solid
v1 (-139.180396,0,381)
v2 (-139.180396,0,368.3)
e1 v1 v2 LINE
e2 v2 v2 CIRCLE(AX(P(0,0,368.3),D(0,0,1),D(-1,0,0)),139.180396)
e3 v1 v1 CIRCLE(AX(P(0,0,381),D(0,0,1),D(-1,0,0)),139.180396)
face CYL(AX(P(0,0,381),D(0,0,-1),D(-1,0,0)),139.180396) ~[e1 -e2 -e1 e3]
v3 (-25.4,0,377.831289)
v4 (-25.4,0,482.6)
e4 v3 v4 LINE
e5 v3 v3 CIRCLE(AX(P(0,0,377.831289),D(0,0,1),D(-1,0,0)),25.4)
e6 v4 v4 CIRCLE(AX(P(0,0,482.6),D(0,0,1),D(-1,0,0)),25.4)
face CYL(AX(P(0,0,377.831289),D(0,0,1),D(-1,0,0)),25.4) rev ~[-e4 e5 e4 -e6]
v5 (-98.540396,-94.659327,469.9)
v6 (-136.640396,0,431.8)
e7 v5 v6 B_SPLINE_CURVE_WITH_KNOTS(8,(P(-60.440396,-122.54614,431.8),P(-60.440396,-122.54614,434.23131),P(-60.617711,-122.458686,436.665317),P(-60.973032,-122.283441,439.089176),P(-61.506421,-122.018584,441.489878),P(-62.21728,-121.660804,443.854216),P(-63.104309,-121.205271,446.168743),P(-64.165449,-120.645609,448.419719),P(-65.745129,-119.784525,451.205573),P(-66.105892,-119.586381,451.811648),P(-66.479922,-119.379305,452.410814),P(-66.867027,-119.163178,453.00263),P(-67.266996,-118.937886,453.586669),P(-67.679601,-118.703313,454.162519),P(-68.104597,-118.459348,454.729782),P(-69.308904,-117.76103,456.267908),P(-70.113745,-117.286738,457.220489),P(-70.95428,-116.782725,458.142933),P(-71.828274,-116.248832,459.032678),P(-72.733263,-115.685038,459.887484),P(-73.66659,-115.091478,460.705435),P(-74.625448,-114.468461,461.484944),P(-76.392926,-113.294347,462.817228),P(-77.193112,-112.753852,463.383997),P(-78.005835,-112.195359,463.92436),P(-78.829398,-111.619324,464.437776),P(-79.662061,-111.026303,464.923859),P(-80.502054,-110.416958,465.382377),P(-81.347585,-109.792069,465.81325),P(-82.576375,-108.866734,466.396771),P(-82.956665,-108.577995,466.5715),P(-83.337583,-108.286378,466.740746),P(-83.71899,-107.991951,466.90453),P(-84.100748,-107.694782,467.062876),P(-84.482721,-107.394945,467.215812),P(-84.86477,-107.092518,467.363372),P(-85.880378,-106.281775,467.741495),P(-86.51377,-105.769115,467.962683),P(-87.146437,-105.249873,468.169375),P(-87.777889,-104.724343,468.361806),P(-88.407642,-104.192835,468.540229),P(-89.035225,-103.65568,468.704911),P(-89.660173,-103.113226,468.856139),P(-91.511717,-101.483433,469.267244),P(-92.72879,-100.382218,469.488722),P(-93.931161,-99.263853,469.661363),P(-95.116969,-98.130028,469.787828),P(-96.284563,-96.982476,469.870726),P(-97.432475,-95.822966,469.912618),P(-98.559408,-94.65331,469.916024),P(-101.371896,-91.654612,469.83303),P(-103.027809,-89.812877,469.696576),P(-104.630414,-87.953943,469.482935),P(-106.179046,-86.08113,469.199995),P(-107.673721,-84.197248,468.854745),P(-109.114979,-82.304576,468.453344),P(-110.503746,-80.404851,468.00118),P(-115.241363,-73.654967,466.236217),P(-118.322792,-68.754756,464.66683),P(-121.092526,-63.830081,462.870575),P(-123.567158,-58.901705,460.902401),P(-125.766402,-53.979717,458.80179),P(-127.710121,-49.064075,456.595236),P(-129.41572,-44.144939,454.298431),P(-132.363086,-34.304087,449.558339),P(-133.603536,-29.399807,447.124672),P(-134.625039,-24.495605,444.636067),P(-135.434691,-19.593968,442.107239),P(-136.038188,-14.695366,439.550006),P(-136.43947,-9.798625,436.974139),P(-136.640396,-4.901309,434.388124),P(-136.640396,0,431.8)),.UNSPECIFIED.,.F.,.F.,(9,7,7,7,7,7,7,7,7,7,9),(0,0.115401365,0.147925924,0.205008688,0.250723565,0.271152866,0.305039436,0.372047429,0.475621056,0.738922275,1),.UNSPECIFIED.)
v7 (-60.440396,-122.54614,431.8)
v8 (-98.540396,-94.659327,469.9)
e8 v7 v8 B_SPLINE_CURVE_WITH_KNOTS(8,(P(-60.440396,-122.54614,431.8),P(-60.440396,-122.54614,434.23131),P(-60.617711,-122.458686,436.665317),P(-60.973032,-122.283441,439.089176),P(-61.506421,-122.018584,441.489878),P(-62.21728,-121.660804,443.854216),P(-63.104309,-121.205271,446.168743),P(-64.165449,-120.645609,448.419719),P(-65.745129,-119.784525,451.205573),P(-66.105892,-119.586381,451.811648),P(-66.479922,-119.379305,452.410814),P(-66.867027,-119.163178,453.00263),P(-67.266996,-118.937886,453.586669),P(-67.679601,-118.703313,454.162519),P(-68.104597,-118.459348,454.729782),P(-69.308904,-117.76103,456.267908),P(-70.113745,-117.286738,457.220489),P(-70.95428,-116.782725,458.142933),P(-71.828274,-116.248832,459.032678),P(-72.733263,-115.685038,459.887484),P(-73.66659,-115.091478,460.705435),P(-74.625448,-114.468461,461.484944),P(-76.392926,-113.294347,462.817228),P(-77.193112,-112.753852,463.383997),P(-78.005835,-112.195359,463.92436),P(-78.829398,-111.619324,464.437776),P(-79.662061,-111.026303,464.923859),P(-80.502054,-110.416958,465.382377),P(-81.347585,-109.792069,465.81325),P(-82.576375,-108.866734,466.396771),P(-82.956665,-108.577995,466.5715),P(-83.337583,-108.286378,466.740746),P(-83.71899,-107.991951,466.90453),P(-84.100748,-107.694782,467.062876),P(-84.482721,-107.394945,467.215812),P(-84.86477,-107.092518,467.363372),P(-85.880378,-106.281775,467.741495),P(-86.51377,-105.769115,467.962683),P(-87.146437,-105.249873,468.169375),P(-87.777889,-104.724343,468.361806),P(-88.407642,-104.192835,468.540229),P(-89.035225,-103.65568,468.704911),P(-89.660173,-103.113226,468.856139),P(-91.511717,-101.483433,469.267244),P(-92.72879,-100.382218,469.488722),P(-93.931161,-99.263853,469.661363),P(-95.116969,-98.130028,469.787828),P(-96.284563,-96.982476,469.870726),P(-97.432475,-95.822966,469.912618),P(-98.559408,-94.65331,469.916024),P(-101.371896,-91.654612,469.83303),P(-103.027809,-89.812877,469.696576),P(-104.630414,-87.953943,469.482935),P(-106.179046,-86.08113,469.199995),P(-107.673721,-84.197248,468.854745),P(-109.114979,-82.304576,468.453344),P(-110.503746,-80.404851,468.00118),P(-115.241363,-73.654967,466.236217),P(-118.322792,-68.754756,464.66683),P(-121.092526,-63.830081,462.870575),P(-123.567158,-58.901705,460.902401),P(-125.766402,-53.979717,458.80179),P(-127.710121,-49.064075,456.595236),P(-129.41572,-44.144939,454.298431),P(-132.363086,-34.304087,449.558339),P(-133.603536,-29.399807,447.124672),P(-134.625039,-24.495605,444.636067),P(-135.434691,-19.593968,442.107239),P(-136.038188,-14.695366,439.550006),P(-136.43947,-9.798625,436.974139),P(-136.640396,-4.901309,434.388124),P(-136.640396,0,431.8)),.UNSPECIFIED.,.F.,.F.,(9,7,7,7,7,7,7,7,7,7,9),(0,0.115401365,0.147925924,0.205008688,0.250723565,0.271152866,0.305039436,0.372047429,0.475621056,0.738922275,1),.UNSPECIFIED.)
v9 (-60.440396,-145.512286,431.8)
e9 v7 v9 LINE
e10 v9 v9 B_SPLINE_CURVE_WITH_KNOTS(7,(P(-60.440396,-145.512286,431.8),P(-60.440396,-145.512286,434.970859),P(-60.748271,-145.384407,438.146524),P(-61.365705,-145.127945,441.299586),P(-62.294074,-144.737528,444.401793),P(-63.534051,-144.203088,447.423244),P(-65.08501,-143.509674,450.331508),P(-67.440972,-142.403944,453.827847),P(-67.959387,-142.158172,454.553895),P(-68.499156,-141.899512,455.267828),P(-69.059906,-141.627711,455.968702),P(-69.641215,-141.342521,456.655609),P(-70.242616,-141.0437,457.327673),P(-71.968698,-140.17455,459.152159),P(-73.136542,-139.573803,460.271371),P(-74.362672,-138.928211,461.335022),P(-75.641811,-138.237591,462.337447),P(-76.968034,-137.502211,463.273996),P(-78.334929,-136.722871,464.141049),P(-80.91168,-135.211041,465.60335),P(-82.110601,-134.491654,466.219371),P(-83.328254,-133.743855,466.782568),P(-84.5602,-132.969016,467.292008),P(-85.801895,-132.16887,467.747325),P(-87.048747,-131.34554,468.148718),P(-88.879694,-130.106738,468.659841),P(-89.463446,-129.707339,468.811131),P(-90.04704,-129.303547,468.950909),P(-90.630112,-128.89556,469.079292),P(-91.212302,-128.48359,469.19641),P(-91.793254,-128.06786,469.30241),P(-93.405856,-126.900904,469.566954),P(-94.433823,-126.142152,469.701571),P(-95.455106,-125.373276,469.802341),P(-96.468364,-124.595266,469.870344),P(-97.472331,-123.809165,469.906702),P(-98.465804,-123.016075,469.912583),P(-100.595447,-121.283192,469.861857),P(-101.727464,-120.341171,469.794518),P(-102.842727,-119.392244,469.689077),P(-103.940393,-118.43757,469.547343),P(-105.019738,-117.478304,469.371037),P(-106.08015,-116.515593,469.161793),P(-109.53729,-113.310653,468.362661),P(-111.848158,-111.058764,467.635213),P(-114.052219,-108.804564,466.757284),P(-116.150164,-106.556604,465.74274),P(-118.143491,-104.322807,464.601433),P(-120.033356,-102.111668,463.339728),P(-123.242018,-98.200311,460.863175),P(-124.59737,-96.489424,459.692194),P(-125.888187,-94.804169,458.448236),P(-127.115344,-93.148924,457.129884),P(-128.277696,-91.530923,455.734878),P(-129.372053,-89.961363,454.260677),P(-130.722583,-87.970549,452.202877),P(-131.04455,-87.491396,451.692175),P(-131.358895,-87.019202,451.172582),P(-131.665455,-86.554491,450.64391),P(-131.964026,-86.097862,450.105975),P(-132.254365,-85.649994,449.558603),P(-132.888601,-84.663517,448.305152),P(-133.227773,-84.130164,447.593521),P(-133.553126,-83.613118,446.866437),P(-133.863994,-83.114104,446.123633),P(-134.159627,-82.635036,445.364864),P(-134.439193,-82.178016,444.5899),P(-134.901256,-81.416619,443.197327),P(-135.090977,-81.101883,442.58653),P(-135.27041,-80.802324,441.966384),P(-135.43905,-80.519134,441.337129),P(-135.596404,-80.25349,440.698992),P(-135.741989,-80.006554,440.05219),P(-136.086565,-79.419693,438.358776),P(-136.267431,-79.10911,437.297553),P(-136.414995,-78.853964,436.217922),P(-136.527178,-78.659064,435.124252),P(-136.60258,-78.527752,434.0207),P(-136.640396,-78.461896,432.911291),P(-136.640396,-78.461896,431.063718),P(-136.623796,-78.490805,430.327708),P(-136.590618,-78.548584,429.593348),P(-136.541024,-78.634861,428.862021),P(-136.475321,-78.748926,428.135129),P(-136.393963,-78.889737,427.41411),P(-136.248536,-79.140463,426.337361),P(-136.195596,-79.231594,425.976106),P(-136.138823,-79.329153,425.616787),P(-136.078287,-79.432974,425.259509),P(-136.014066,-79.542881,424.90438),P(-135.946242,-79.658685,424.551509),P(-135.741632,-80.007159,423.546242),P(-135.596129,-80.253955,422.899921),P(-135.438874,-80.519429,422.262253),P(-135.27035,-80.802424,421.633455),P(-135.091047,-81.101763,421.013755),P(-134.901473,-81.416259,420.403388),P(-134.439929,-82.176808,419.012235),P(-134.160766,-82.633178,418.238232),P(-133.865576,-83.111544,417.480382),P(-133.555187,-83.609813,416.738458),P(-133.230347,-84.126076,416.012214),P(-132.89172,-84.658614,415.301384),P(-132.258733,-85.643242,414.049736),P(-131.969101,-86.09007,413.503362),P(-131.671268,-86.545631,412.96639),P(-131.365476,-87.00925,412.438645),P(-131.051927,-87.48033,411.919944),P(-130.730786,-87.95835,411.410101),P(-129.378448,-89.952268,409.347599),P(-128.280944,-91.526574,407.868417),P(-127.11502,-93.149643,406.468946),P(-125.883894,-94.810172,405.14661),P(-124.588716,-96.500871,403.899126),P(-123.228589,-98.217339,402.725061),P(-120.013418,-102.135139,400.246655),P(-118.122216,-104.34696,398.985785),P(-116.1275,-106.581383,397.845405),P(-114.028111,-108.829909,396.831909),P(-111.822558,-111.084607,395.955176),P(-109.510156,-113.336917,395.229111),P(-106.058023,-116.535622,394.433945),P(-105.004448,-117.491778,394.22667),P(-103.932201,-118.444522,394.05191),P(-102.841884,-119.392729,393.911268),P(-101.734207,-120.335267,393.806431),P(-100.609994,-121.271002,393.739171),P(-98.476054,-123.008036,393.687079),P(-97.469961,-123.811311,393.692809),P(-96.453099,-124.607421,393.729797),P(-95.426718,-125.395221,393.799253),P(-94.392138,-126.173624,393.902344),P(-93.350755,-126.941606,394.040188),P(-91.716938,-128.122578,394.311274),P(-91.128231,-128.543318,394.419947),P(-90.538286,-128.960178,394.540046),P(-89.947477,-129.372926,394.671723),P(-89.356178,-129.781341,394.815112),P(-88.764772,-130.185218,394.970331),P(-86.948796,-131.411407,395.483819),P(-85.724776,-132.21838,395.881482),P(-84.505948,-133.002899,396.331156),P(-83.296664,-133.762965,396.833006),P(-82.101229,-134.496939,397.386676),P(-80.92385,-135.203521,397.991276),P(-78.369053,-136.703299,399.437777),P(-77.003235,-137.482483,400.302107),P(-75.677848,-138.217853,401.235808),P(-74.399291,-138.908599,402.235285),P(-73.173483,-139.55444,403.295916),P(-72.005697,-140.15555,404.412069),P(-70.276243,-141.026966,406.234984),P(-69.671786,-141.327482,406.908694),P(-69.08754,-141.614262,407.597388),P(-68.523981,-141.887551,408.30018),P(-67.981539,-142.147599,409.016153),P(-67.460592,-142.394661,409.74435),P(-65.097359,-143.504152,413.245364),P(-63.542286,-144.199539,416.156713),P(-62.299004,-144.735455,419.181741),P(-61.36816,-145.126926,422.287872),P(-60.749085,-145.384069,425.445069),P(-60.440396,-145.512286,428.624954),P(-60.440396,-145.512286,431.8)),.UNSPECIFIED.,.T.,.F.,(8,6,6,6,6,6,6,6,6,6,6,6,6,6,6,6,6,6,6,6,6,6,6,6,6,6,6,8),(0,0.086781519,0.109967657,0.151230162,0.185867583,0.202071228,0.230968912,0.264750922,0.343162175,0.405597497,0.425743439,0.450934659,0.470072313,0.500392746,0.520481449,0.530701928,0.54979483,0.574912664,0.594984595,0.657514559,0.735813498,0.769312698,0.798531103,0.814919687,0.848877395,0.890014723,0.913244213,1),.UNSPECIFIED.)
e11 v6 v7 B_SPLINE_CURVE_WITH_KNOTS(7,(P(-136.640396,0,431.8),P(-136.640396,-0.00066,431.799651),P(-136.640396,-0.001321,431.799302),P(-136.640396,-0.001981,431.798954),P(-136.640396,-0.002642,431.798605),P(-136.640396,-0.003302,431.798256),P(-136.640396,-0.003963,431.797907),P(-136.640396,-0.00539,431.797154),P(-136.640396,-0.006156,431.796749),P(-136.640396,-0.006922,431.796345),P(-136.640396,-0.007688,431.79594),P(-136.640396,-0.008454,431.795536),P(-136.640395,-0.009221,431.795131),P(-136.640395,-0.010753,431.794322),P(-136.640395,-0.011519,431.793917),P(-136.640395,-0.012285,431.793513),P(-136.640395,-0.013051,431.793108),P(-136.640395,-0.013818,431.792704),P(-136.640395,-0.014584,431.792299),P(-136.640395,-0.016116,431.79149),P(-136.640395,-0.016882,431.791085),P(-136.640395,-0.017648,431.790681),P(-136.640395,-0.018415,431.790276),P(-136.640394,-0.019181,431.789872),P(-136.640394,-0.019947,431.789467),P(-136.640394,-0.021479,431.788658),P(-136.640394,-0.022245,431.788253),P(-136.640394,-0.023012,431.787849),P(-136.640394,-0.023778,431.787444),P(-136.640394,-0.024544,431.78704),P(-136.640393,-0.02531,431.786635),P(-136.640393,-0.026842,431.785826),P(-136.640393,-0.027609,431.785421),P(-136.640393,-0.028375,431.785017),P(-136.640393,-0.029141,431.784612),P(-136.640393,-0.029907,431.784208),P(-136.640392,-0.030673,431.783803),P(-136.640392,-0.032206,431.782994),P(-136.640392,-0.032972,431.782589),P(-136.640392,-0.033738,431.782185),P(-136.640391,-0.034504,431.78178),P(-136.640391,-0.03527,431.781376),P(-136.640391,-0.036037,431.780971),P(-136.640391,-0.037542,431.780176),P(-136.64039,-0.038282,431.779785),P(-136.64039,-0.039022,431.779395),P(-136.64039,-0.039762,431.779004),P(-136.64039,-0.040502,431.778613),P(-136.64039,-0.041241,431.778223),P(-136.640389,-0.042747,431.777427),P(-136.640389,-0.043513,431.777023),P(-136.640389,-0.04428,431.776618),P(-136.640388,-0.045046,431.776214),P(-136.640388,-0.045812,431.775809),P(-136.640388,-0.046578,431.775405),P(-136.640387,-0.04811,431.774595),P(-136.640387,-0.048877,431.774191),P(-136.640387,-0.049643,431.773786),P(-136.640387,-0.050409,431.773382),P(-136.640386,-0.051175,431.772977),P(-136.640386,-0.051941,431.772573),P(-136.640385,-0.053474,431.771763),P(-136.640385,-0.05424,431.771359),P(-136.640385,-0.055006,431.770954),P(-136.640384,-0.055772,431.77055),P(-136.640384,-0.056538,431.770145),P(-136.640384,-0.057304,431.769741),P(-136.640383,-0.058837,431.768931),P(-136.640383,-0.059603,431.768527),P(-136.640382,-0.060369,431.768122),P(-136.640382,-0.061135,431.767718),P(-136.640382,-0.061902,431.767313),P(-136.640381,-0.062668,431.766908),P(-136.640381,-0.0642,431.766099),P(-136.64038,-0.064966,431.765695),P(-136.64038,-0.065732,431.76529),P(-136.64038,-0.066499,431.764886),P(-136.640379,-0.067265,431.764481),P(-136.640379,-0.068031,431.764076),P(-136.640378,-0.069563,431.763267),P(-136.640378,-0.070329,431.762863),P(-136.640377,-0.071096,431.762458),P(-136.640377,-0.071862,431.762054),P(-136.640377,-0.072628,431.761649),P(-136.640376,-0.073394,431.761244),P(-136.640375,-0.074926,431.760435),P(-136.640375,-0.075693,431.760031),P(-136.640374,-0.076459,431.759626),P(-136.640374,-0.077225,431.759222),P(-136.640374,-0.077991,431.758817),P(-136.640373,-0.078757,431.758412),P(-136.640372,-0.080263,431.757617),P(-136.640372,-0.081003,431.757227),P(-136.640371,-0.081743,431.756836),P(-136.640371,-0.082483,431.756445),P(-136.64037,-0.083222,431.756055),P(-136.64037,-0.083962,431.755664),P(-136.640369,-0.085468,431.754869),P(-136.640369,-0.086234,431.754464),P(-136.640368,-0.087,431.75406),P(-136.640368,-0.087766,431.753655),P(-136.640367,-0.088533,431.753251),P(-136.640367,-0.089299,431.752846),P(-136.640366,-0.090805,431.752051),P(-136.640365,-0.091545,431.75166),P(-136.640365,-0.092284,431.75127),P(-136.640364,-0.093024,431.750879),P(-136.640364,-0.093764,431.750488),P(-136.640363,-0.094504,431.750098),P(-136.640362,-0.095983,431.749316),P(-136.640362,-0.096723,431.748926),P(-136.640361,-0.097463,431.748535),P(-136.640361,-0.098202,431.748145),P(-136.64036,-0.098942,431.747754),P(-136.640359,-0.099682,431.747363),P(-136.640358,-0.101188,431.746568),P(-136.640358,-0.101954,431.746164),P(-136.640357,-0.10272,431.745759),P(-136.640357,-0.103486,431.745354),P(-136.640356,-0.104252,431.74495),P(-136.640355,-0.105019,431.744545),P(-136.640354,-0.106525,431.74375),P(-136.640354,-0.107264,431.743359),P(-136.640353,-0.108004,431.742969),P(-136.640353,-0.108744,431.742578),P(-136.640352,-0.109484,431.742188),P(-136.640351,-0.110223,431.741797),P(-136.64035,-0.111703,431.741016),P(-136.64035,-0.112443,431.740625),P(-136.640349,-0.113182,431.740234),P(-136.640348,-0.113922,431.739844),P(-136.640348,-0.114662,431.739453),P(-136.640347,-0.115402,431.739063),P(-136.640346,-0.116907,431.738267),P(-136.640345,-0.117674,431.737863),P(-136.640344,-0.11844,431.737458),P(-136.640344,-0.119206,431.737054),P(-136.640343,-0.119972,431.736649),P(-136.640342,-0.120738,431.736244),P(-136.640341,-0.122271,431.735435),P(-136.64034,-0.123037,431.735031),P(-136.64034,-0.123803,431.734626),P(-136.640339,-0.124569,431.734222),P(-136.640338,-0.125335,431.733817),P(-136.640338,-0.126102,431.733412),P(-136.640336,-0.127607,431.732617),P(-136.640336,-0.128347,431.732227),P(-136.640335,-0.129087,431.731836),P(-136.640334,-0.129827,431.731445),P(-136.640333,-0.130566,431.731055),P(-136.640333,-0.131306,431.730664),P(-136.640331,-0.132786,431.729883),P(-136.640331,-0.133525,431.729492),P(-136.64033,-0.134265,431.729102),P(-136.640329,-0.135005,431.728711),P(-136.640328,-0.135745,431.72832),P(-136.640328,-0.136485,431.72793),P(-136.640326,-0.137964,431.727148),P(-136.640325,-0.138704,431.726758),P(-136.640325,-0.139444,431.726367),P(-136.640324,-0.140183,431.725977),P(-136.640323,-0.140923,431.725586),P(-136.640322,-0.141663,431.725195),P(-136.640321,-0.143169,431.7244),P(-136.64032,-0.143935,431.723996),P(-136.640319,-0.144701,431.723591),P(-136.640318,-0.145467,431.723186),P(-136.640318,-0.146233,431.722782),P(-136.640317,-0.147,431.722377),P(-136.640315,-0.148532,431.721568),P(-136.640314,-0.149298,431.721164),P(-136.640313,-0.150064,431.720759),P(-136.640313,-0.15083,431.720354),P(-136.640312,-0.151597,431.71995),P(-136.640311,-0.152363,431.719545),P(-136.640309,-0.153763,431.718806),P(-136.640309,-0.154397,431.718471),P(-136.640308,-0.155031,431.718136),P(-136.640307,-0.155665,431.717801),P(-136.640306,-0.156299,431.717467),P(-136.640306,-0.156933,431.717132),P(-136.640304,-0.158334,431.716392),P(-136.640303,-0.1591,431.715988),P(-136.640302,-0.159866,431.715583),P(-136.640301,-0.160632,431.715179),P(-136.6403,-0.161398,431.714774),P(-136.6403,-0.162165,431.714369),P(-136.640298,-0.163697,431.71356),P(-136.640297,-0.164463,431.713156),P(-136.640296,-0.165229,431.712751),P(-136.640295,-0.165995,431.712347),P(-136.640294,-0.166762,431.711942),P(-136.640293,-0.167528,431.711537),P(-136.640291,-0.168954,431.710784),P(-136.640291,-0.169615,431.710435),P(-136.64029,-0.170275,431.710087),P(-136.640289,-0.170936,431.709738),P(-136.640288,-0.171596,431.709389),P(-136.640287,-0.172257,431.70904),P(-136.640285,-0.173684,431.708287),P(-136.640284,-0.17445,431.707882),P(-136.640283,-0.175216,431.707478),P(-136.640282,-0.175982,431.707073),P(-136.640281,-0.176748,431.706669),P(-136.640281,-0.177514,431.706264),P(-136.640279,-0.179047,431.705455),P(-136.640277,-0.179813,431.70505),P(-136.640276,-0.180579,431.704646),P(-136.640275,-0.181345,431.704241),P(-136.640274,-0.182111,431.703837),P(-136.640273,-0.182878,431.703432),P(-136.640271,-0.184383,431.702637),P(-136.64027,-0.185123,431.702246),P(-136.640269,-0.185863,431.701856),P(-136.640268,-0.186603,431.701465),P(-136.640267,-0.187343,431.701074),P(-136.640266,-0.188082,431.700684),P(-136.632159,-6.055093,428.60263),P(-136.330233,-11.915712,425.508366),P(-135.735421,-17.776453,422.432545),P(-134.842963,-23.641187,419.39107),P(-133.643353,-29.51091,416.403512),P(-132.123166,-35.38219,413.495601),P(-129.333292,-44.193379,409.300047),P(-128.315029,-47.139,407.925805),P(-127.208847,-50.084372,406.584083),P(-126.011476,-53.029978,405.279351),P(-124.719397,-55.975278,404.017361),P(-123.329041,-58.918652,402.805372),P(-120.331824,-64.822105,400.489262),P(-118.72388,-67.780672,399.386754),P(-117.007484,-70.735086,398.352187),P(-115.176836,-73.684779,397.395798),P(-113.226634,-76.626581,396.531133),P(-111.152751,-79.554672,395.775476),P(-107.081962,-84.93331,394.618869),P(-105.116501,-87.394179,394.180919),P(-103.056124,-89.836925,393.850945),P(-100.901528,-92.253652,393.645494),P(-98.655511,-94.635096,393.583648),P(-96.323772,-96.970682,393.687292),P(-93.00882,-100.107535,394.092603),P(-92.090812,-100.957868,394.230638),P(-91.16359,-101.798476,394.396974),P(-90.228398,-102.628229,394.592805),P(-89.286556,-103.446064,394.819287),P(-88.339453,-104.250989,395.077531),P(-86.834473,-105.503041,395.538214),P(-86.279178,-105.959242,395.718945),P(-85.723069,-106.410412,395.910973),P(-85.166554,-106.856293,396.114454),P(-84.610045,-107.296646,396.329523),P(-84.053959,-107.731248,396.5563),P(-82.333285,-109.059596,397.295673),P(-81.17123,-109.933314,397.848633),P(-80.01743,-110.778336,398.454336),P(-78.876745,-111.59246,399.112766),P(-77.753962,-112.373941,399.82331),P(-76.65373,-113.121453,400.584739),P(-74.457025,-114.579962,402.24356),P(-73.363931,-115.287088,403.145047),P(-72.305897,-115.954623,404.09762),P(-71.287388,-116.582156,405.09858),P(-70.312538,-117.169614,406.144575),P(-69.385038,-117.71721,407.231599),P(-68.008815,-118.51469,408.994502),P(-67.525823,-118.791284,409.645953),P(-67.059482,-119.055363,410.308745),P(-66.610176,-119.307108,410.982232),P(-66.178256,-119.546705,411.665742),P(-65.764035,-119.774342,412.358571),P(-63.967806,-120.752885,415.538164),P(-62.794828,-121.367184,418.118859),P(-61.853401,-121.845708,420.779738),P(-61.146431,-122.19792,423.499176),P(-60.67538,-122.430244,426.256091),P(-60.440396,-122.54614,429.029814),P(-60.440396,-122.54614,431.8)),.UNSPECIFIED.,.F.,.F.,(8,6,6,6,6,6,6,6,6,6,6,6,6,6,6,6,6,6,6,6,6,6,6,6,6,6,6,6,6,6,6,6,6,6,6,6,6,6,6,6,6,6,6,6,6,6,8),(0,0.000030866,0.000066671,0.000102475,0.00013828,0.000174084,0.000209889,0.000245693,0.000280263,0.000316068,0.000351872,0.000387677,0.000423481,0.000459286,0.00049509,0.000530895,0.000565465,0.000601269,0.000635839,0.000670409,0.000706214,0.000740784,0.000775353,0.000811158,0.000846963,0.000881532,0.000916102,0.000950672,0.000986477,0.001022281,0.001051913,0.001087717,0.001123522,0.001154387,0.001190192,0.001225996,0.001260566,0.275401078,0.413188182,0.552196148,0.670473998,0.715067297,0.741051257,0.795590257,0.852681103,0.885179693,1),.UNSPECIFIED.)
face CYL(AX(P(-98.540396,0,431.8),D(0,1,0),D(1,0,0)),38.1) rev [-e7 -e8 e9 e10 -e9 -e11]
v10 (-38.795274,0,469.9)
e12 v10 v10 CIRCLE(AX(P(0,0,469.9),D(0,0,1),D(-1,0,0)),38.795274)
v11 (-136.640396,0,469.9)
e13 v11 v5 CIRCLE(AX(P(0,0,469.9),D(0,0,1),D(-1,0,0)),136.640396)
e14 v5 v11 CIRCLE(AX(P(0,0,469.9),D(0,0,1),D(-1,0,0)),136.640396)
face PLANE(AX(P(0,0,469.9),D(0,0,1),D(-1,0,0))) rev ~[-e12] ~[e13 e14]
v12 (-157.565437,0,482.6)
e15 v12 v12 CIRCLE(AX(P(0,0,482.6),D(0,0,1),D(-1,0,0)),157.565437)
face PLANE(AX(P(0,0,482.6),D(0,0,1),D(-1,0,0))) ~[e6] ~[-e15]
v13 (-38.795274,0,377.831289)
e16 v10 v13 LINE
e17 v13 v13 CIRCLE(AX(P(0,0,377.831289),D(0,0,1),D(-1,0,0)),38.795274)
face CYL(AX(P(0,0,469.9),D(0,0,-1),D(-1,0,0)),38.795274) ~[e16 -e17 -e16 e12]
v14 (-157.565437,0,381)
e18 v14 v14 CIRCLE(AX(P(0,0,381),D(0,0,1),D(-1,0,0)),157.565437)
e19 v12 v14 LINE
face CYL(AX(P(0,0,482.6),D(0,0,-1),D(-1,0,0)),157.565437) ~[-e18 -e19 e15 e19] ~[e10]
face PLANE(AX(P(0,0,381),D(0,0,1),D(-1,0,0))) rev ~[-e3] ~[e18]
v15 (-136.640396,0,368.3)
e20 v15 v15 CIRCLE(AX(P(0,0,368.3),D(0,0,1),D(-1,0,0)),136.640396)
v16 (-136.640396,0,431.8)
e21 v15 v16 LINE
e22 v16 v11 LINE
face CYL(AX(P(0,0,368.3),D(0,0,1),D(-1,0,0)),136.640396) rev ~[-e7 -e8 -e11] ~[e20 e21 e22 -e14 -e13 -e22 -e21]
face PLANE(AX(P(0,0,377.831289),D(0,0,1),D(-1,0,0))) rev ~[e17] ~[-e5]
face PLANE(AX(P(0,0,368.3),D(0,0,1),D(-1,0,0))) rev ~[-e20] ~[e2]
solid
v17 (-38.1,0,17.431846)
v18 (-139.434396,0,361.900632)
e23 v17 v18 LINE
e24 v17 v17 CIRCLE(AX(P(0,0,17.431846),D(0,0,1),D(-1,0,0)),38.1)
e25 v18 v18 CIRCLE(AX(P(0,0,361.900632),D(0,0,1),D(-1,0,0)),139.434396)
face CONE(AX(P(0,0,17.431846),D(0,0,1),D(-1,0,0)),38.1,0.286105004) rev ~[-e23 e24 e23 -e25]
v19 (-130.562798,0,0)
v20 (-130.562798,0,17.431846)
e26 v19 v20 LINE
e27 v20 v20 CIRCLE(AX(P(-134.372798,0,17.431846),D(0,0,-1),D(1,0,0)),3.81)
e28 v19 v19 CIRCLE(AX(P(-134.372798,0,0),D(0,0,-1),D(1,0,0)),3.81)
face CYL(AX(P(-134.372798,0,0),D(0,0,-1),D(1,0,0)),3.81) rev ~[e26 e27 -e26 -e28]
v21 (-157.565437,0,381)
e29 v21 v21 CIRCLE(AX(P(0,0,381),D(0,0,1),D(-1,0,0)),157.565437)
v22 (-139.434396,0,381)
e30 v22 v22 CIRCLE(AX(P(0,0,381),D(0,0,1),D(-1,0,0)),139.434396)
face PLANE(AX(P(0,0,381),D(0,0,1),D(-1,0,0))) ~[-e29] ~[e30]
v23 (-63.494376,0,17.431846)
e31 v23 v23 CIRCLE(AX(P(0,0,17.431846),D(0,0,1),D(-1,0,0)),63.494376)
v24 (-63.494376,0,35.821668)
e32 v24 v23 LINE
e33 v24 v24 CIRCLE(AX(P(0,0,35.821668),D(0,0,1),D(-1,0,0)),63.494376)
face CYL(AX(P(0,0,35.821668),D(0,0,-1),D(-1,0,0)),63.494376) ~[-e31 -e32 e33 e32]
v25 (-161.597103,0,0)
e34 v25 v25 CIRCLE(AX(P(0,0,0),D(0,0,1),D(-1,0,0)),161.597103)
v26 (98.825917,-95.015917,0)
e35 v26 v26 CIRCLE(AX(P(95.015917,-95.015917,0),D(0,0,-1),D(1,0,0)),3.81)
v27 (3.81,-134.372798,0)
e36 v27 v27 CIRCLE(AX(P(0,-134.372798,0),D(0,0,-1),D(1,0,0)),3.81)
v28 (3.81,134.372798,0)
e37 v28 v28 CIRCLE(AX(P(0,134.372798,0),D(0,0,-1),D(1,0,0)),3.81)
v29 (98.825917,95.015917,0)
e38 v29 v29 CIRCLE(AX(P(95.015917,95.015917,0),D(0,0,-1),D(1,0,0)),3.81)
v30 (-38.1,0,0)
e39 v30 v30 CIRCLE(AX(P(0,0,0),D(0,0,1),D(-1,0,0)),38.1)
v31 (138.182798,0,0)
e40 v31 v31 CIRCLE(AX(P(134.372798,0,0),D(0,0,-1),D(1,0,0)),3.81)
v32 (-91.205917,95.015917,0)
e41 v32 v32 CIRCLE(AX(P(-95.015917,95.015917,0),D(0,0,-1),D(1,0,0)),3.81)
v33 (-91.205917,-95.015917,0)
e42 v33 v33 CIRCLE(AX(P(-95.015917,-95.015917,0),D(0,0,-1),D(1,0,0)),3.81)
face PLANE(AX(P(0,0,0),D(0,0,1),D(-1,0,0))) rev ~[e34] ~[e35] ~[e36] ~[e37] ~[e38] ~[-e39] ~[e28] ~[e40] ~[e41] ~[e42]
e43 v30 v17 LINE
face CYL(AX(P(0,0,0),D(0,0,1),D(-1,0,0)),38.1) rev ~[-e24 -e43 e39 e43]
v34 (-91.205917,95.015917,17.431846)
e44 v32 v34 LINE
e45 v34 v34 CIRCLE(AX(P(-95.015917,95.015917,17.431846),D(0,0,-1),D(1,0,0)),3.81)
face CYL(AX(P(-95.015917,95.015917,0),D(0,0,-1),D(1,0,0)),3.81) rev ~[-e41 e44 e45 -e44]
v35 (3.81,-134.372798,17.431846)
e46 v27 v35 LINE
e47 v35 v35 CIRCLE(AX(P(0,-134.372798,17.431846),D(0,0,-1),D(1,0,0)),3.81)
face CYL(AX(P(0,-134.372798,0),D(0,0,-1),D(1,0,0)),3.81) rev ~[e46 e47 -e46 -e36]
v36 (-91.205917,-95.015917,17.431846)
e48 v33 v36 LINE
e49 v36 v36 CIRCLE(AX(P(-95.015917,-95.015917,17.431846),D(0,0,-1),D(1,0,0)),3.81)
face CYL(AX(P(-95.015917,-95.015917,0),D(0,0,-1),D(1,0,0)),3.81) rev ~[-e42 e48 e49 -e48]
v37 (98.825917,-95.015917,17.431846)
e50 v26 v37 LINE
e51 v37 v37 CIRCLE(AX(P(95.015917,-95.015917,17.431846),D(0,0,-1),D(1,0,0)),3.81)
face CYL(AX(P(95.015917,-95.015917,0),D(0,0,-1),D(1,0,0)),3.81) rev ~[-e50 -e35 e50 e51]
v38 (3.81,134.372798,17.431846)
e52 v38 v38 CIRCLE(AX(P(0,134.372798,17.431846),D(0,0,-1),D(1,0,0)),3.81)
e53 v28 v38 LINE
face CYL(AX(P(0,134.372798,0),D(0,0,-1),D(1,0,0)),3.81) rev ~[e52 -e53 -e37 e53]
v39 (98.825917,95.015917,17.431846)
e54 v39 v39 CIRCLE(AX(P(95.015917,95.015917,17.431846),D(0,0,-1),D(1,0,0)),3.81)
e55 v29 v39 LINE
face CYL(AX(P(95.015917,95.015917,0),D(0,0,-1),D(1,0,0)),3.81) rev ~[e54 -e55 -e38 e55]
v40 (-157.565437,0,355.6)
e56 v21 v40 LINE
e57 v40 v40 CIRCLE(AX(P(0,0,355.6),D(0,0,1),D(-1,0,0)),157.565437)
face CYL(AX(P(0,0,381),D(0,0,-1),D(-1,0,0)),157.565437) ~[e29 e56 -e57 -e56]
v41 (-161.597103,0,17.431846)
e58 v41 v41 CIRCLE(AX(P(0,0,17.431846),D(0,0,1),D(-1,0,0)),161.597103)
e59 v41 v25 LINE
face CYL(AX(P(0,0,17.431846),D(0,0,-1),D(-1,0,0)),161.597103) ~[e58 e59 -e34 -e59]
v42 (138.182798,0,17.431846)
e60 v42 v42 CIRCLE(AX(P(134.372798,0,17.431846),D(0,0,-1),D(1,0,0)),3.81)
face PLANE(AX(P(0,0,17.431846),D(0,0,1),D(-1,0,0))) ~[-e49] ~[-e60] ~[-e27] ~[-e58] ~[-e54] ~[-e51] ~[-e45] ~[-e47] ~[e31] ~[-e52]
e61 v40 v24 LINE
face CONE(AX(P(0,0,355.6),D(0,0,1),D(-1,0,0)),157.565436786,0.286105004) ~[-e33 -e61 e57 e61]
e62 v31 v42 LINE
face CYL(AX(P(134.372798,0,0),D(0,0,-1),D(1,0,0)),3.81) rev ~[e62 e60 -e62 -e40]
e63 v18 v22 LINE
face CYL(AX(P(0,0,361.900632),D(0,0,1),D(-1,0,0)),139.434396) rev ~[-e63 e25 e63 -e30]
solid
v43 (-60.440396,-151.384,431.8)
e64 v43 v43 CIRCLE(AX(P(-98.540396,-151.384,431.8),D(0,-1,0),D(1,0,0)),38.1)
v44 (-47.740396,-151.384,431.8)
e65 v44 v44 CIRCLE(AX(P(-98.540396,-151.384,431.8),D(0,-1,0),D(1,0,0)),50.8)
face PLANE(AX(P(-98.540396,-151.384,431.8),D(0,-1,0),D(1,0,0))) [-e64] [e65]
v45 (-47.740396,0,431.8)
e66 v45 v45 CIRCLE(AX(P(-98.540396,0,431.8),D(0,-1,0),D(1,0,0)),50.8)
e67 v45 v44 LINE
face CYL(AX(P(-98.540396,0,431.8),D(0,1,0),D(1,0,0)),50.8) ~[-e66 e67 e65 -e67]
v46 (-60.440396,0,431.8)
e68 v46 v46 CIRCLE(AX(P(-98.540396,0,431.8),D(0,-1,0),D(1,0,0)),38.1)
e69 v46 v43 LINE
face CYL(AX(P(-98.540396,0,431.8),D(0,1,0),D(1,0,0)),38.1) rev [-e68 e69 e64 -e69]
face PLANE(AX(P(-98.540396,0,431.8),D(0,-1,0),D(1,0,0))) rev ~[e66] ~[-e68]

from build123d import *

# Parameters (mm, degrees)
F2_R     = 3.81
F3_DEPTH = 17.4318458885
F6_R     = 50.8
F6_R_2   = 38.1
F7_DEPTH = 151.384
F8_R     = 38.1
F9_DEPTH = 150.876


with BuildPart() as f1:
    # F0 (on Front) → F1 (revolve)
    with BuildSketch(Plane.XZ):
        Polygon((-161.5971028805, 0), (-38.1, 0), (-38.1, 17.4318458885), (-139.4343958063, 361.9006321764), (-139.4343958063, 381), (-157.5654367864, 381), (-157.5654367864, 355.6), (-63.4943762833, 35.8216682846), (-63.4943762833, 17.4318458885), (-161.5971028805, 17.4318458885), align=None)
    revolve(axis=Axis((0, 0, 239.9535179138), (0, 0, 1)))

    # F2 (on face) → F3 (cut, through all)
    with BuildSketch(Plane(origin=(0, 0, 0), x_dir=(1, 0, 0), z_dir=(0, 0, -1))):
        with Locations((95.015916754, -95.015916754)):
            Circle(F2_R)
        with Locations((0, -134.3727981148)):
            Circle(F2_R)
        with Locations((-95.015916754, -95.015916754)):
            Circle(F2_R)
        with Locations((-134.3727981148, 0)):
            Circle(F2_R)
        with Locations((-95.015916754, 95.015916754)):
            Circle(F2_R)
        with Locations((0, 134.3727981148)):
            Circle(F2_R)
        with Locations((134.3727981148, 0)):
            Circle(F2_R)
        with Locations((95.015916754, 95.015916754)):
            Circle(F2_R)
    extrude(amount=-F3_DEPTH, mode=Mode.SUBTRACT)


with BuildPart() as f5:
    # F4 (on Front) → F5 (revolve)
    with BuildSketch(Plane.XZ):
        Polygon((-139.1803958063, 381), (-139.1803958063, 368.3), (-136.6403958063, 368.3), (-136.6403958063, 469.9), (-38.795273751, 469.9), (-38.795273751, 377.8312887669), (-25.4, 377.8312887669), (-25.4, 482.6), (-38.795273751, 482.6), (-157.5654367864, 482.6), (-157.5654367864, 469.9), (-157.5654367864, 381), align=None)
    revolve(axis=Axis((0, 0, 239.9535179138), (0, 0, 1)))

    # F8 (on Front) → F9 (cut)
    with BuildSketch(Plane.XZ):
        with Locations((-98.5403958063, 431.8)):
            Circle(F8_R)
    extrude(amount=F9_DEPTH, mode=Mode.SUBTRACT)


with BuildPart() as f7:
    # F6 (on Front) → F7 (new body)
    with BuildSketch(Plane.XZ):
        with Locations((-98.5403958063, 431.8)):
            Circle(F6_R)
        with Locations((-98.5403958063, 431.8)):
            Circle(F6_R_2, mode=Mode.SUBTRACT)
    extrude(amount=F7_DEPTH)


solid = Compound([f1.part, f5.part, f7.part])
